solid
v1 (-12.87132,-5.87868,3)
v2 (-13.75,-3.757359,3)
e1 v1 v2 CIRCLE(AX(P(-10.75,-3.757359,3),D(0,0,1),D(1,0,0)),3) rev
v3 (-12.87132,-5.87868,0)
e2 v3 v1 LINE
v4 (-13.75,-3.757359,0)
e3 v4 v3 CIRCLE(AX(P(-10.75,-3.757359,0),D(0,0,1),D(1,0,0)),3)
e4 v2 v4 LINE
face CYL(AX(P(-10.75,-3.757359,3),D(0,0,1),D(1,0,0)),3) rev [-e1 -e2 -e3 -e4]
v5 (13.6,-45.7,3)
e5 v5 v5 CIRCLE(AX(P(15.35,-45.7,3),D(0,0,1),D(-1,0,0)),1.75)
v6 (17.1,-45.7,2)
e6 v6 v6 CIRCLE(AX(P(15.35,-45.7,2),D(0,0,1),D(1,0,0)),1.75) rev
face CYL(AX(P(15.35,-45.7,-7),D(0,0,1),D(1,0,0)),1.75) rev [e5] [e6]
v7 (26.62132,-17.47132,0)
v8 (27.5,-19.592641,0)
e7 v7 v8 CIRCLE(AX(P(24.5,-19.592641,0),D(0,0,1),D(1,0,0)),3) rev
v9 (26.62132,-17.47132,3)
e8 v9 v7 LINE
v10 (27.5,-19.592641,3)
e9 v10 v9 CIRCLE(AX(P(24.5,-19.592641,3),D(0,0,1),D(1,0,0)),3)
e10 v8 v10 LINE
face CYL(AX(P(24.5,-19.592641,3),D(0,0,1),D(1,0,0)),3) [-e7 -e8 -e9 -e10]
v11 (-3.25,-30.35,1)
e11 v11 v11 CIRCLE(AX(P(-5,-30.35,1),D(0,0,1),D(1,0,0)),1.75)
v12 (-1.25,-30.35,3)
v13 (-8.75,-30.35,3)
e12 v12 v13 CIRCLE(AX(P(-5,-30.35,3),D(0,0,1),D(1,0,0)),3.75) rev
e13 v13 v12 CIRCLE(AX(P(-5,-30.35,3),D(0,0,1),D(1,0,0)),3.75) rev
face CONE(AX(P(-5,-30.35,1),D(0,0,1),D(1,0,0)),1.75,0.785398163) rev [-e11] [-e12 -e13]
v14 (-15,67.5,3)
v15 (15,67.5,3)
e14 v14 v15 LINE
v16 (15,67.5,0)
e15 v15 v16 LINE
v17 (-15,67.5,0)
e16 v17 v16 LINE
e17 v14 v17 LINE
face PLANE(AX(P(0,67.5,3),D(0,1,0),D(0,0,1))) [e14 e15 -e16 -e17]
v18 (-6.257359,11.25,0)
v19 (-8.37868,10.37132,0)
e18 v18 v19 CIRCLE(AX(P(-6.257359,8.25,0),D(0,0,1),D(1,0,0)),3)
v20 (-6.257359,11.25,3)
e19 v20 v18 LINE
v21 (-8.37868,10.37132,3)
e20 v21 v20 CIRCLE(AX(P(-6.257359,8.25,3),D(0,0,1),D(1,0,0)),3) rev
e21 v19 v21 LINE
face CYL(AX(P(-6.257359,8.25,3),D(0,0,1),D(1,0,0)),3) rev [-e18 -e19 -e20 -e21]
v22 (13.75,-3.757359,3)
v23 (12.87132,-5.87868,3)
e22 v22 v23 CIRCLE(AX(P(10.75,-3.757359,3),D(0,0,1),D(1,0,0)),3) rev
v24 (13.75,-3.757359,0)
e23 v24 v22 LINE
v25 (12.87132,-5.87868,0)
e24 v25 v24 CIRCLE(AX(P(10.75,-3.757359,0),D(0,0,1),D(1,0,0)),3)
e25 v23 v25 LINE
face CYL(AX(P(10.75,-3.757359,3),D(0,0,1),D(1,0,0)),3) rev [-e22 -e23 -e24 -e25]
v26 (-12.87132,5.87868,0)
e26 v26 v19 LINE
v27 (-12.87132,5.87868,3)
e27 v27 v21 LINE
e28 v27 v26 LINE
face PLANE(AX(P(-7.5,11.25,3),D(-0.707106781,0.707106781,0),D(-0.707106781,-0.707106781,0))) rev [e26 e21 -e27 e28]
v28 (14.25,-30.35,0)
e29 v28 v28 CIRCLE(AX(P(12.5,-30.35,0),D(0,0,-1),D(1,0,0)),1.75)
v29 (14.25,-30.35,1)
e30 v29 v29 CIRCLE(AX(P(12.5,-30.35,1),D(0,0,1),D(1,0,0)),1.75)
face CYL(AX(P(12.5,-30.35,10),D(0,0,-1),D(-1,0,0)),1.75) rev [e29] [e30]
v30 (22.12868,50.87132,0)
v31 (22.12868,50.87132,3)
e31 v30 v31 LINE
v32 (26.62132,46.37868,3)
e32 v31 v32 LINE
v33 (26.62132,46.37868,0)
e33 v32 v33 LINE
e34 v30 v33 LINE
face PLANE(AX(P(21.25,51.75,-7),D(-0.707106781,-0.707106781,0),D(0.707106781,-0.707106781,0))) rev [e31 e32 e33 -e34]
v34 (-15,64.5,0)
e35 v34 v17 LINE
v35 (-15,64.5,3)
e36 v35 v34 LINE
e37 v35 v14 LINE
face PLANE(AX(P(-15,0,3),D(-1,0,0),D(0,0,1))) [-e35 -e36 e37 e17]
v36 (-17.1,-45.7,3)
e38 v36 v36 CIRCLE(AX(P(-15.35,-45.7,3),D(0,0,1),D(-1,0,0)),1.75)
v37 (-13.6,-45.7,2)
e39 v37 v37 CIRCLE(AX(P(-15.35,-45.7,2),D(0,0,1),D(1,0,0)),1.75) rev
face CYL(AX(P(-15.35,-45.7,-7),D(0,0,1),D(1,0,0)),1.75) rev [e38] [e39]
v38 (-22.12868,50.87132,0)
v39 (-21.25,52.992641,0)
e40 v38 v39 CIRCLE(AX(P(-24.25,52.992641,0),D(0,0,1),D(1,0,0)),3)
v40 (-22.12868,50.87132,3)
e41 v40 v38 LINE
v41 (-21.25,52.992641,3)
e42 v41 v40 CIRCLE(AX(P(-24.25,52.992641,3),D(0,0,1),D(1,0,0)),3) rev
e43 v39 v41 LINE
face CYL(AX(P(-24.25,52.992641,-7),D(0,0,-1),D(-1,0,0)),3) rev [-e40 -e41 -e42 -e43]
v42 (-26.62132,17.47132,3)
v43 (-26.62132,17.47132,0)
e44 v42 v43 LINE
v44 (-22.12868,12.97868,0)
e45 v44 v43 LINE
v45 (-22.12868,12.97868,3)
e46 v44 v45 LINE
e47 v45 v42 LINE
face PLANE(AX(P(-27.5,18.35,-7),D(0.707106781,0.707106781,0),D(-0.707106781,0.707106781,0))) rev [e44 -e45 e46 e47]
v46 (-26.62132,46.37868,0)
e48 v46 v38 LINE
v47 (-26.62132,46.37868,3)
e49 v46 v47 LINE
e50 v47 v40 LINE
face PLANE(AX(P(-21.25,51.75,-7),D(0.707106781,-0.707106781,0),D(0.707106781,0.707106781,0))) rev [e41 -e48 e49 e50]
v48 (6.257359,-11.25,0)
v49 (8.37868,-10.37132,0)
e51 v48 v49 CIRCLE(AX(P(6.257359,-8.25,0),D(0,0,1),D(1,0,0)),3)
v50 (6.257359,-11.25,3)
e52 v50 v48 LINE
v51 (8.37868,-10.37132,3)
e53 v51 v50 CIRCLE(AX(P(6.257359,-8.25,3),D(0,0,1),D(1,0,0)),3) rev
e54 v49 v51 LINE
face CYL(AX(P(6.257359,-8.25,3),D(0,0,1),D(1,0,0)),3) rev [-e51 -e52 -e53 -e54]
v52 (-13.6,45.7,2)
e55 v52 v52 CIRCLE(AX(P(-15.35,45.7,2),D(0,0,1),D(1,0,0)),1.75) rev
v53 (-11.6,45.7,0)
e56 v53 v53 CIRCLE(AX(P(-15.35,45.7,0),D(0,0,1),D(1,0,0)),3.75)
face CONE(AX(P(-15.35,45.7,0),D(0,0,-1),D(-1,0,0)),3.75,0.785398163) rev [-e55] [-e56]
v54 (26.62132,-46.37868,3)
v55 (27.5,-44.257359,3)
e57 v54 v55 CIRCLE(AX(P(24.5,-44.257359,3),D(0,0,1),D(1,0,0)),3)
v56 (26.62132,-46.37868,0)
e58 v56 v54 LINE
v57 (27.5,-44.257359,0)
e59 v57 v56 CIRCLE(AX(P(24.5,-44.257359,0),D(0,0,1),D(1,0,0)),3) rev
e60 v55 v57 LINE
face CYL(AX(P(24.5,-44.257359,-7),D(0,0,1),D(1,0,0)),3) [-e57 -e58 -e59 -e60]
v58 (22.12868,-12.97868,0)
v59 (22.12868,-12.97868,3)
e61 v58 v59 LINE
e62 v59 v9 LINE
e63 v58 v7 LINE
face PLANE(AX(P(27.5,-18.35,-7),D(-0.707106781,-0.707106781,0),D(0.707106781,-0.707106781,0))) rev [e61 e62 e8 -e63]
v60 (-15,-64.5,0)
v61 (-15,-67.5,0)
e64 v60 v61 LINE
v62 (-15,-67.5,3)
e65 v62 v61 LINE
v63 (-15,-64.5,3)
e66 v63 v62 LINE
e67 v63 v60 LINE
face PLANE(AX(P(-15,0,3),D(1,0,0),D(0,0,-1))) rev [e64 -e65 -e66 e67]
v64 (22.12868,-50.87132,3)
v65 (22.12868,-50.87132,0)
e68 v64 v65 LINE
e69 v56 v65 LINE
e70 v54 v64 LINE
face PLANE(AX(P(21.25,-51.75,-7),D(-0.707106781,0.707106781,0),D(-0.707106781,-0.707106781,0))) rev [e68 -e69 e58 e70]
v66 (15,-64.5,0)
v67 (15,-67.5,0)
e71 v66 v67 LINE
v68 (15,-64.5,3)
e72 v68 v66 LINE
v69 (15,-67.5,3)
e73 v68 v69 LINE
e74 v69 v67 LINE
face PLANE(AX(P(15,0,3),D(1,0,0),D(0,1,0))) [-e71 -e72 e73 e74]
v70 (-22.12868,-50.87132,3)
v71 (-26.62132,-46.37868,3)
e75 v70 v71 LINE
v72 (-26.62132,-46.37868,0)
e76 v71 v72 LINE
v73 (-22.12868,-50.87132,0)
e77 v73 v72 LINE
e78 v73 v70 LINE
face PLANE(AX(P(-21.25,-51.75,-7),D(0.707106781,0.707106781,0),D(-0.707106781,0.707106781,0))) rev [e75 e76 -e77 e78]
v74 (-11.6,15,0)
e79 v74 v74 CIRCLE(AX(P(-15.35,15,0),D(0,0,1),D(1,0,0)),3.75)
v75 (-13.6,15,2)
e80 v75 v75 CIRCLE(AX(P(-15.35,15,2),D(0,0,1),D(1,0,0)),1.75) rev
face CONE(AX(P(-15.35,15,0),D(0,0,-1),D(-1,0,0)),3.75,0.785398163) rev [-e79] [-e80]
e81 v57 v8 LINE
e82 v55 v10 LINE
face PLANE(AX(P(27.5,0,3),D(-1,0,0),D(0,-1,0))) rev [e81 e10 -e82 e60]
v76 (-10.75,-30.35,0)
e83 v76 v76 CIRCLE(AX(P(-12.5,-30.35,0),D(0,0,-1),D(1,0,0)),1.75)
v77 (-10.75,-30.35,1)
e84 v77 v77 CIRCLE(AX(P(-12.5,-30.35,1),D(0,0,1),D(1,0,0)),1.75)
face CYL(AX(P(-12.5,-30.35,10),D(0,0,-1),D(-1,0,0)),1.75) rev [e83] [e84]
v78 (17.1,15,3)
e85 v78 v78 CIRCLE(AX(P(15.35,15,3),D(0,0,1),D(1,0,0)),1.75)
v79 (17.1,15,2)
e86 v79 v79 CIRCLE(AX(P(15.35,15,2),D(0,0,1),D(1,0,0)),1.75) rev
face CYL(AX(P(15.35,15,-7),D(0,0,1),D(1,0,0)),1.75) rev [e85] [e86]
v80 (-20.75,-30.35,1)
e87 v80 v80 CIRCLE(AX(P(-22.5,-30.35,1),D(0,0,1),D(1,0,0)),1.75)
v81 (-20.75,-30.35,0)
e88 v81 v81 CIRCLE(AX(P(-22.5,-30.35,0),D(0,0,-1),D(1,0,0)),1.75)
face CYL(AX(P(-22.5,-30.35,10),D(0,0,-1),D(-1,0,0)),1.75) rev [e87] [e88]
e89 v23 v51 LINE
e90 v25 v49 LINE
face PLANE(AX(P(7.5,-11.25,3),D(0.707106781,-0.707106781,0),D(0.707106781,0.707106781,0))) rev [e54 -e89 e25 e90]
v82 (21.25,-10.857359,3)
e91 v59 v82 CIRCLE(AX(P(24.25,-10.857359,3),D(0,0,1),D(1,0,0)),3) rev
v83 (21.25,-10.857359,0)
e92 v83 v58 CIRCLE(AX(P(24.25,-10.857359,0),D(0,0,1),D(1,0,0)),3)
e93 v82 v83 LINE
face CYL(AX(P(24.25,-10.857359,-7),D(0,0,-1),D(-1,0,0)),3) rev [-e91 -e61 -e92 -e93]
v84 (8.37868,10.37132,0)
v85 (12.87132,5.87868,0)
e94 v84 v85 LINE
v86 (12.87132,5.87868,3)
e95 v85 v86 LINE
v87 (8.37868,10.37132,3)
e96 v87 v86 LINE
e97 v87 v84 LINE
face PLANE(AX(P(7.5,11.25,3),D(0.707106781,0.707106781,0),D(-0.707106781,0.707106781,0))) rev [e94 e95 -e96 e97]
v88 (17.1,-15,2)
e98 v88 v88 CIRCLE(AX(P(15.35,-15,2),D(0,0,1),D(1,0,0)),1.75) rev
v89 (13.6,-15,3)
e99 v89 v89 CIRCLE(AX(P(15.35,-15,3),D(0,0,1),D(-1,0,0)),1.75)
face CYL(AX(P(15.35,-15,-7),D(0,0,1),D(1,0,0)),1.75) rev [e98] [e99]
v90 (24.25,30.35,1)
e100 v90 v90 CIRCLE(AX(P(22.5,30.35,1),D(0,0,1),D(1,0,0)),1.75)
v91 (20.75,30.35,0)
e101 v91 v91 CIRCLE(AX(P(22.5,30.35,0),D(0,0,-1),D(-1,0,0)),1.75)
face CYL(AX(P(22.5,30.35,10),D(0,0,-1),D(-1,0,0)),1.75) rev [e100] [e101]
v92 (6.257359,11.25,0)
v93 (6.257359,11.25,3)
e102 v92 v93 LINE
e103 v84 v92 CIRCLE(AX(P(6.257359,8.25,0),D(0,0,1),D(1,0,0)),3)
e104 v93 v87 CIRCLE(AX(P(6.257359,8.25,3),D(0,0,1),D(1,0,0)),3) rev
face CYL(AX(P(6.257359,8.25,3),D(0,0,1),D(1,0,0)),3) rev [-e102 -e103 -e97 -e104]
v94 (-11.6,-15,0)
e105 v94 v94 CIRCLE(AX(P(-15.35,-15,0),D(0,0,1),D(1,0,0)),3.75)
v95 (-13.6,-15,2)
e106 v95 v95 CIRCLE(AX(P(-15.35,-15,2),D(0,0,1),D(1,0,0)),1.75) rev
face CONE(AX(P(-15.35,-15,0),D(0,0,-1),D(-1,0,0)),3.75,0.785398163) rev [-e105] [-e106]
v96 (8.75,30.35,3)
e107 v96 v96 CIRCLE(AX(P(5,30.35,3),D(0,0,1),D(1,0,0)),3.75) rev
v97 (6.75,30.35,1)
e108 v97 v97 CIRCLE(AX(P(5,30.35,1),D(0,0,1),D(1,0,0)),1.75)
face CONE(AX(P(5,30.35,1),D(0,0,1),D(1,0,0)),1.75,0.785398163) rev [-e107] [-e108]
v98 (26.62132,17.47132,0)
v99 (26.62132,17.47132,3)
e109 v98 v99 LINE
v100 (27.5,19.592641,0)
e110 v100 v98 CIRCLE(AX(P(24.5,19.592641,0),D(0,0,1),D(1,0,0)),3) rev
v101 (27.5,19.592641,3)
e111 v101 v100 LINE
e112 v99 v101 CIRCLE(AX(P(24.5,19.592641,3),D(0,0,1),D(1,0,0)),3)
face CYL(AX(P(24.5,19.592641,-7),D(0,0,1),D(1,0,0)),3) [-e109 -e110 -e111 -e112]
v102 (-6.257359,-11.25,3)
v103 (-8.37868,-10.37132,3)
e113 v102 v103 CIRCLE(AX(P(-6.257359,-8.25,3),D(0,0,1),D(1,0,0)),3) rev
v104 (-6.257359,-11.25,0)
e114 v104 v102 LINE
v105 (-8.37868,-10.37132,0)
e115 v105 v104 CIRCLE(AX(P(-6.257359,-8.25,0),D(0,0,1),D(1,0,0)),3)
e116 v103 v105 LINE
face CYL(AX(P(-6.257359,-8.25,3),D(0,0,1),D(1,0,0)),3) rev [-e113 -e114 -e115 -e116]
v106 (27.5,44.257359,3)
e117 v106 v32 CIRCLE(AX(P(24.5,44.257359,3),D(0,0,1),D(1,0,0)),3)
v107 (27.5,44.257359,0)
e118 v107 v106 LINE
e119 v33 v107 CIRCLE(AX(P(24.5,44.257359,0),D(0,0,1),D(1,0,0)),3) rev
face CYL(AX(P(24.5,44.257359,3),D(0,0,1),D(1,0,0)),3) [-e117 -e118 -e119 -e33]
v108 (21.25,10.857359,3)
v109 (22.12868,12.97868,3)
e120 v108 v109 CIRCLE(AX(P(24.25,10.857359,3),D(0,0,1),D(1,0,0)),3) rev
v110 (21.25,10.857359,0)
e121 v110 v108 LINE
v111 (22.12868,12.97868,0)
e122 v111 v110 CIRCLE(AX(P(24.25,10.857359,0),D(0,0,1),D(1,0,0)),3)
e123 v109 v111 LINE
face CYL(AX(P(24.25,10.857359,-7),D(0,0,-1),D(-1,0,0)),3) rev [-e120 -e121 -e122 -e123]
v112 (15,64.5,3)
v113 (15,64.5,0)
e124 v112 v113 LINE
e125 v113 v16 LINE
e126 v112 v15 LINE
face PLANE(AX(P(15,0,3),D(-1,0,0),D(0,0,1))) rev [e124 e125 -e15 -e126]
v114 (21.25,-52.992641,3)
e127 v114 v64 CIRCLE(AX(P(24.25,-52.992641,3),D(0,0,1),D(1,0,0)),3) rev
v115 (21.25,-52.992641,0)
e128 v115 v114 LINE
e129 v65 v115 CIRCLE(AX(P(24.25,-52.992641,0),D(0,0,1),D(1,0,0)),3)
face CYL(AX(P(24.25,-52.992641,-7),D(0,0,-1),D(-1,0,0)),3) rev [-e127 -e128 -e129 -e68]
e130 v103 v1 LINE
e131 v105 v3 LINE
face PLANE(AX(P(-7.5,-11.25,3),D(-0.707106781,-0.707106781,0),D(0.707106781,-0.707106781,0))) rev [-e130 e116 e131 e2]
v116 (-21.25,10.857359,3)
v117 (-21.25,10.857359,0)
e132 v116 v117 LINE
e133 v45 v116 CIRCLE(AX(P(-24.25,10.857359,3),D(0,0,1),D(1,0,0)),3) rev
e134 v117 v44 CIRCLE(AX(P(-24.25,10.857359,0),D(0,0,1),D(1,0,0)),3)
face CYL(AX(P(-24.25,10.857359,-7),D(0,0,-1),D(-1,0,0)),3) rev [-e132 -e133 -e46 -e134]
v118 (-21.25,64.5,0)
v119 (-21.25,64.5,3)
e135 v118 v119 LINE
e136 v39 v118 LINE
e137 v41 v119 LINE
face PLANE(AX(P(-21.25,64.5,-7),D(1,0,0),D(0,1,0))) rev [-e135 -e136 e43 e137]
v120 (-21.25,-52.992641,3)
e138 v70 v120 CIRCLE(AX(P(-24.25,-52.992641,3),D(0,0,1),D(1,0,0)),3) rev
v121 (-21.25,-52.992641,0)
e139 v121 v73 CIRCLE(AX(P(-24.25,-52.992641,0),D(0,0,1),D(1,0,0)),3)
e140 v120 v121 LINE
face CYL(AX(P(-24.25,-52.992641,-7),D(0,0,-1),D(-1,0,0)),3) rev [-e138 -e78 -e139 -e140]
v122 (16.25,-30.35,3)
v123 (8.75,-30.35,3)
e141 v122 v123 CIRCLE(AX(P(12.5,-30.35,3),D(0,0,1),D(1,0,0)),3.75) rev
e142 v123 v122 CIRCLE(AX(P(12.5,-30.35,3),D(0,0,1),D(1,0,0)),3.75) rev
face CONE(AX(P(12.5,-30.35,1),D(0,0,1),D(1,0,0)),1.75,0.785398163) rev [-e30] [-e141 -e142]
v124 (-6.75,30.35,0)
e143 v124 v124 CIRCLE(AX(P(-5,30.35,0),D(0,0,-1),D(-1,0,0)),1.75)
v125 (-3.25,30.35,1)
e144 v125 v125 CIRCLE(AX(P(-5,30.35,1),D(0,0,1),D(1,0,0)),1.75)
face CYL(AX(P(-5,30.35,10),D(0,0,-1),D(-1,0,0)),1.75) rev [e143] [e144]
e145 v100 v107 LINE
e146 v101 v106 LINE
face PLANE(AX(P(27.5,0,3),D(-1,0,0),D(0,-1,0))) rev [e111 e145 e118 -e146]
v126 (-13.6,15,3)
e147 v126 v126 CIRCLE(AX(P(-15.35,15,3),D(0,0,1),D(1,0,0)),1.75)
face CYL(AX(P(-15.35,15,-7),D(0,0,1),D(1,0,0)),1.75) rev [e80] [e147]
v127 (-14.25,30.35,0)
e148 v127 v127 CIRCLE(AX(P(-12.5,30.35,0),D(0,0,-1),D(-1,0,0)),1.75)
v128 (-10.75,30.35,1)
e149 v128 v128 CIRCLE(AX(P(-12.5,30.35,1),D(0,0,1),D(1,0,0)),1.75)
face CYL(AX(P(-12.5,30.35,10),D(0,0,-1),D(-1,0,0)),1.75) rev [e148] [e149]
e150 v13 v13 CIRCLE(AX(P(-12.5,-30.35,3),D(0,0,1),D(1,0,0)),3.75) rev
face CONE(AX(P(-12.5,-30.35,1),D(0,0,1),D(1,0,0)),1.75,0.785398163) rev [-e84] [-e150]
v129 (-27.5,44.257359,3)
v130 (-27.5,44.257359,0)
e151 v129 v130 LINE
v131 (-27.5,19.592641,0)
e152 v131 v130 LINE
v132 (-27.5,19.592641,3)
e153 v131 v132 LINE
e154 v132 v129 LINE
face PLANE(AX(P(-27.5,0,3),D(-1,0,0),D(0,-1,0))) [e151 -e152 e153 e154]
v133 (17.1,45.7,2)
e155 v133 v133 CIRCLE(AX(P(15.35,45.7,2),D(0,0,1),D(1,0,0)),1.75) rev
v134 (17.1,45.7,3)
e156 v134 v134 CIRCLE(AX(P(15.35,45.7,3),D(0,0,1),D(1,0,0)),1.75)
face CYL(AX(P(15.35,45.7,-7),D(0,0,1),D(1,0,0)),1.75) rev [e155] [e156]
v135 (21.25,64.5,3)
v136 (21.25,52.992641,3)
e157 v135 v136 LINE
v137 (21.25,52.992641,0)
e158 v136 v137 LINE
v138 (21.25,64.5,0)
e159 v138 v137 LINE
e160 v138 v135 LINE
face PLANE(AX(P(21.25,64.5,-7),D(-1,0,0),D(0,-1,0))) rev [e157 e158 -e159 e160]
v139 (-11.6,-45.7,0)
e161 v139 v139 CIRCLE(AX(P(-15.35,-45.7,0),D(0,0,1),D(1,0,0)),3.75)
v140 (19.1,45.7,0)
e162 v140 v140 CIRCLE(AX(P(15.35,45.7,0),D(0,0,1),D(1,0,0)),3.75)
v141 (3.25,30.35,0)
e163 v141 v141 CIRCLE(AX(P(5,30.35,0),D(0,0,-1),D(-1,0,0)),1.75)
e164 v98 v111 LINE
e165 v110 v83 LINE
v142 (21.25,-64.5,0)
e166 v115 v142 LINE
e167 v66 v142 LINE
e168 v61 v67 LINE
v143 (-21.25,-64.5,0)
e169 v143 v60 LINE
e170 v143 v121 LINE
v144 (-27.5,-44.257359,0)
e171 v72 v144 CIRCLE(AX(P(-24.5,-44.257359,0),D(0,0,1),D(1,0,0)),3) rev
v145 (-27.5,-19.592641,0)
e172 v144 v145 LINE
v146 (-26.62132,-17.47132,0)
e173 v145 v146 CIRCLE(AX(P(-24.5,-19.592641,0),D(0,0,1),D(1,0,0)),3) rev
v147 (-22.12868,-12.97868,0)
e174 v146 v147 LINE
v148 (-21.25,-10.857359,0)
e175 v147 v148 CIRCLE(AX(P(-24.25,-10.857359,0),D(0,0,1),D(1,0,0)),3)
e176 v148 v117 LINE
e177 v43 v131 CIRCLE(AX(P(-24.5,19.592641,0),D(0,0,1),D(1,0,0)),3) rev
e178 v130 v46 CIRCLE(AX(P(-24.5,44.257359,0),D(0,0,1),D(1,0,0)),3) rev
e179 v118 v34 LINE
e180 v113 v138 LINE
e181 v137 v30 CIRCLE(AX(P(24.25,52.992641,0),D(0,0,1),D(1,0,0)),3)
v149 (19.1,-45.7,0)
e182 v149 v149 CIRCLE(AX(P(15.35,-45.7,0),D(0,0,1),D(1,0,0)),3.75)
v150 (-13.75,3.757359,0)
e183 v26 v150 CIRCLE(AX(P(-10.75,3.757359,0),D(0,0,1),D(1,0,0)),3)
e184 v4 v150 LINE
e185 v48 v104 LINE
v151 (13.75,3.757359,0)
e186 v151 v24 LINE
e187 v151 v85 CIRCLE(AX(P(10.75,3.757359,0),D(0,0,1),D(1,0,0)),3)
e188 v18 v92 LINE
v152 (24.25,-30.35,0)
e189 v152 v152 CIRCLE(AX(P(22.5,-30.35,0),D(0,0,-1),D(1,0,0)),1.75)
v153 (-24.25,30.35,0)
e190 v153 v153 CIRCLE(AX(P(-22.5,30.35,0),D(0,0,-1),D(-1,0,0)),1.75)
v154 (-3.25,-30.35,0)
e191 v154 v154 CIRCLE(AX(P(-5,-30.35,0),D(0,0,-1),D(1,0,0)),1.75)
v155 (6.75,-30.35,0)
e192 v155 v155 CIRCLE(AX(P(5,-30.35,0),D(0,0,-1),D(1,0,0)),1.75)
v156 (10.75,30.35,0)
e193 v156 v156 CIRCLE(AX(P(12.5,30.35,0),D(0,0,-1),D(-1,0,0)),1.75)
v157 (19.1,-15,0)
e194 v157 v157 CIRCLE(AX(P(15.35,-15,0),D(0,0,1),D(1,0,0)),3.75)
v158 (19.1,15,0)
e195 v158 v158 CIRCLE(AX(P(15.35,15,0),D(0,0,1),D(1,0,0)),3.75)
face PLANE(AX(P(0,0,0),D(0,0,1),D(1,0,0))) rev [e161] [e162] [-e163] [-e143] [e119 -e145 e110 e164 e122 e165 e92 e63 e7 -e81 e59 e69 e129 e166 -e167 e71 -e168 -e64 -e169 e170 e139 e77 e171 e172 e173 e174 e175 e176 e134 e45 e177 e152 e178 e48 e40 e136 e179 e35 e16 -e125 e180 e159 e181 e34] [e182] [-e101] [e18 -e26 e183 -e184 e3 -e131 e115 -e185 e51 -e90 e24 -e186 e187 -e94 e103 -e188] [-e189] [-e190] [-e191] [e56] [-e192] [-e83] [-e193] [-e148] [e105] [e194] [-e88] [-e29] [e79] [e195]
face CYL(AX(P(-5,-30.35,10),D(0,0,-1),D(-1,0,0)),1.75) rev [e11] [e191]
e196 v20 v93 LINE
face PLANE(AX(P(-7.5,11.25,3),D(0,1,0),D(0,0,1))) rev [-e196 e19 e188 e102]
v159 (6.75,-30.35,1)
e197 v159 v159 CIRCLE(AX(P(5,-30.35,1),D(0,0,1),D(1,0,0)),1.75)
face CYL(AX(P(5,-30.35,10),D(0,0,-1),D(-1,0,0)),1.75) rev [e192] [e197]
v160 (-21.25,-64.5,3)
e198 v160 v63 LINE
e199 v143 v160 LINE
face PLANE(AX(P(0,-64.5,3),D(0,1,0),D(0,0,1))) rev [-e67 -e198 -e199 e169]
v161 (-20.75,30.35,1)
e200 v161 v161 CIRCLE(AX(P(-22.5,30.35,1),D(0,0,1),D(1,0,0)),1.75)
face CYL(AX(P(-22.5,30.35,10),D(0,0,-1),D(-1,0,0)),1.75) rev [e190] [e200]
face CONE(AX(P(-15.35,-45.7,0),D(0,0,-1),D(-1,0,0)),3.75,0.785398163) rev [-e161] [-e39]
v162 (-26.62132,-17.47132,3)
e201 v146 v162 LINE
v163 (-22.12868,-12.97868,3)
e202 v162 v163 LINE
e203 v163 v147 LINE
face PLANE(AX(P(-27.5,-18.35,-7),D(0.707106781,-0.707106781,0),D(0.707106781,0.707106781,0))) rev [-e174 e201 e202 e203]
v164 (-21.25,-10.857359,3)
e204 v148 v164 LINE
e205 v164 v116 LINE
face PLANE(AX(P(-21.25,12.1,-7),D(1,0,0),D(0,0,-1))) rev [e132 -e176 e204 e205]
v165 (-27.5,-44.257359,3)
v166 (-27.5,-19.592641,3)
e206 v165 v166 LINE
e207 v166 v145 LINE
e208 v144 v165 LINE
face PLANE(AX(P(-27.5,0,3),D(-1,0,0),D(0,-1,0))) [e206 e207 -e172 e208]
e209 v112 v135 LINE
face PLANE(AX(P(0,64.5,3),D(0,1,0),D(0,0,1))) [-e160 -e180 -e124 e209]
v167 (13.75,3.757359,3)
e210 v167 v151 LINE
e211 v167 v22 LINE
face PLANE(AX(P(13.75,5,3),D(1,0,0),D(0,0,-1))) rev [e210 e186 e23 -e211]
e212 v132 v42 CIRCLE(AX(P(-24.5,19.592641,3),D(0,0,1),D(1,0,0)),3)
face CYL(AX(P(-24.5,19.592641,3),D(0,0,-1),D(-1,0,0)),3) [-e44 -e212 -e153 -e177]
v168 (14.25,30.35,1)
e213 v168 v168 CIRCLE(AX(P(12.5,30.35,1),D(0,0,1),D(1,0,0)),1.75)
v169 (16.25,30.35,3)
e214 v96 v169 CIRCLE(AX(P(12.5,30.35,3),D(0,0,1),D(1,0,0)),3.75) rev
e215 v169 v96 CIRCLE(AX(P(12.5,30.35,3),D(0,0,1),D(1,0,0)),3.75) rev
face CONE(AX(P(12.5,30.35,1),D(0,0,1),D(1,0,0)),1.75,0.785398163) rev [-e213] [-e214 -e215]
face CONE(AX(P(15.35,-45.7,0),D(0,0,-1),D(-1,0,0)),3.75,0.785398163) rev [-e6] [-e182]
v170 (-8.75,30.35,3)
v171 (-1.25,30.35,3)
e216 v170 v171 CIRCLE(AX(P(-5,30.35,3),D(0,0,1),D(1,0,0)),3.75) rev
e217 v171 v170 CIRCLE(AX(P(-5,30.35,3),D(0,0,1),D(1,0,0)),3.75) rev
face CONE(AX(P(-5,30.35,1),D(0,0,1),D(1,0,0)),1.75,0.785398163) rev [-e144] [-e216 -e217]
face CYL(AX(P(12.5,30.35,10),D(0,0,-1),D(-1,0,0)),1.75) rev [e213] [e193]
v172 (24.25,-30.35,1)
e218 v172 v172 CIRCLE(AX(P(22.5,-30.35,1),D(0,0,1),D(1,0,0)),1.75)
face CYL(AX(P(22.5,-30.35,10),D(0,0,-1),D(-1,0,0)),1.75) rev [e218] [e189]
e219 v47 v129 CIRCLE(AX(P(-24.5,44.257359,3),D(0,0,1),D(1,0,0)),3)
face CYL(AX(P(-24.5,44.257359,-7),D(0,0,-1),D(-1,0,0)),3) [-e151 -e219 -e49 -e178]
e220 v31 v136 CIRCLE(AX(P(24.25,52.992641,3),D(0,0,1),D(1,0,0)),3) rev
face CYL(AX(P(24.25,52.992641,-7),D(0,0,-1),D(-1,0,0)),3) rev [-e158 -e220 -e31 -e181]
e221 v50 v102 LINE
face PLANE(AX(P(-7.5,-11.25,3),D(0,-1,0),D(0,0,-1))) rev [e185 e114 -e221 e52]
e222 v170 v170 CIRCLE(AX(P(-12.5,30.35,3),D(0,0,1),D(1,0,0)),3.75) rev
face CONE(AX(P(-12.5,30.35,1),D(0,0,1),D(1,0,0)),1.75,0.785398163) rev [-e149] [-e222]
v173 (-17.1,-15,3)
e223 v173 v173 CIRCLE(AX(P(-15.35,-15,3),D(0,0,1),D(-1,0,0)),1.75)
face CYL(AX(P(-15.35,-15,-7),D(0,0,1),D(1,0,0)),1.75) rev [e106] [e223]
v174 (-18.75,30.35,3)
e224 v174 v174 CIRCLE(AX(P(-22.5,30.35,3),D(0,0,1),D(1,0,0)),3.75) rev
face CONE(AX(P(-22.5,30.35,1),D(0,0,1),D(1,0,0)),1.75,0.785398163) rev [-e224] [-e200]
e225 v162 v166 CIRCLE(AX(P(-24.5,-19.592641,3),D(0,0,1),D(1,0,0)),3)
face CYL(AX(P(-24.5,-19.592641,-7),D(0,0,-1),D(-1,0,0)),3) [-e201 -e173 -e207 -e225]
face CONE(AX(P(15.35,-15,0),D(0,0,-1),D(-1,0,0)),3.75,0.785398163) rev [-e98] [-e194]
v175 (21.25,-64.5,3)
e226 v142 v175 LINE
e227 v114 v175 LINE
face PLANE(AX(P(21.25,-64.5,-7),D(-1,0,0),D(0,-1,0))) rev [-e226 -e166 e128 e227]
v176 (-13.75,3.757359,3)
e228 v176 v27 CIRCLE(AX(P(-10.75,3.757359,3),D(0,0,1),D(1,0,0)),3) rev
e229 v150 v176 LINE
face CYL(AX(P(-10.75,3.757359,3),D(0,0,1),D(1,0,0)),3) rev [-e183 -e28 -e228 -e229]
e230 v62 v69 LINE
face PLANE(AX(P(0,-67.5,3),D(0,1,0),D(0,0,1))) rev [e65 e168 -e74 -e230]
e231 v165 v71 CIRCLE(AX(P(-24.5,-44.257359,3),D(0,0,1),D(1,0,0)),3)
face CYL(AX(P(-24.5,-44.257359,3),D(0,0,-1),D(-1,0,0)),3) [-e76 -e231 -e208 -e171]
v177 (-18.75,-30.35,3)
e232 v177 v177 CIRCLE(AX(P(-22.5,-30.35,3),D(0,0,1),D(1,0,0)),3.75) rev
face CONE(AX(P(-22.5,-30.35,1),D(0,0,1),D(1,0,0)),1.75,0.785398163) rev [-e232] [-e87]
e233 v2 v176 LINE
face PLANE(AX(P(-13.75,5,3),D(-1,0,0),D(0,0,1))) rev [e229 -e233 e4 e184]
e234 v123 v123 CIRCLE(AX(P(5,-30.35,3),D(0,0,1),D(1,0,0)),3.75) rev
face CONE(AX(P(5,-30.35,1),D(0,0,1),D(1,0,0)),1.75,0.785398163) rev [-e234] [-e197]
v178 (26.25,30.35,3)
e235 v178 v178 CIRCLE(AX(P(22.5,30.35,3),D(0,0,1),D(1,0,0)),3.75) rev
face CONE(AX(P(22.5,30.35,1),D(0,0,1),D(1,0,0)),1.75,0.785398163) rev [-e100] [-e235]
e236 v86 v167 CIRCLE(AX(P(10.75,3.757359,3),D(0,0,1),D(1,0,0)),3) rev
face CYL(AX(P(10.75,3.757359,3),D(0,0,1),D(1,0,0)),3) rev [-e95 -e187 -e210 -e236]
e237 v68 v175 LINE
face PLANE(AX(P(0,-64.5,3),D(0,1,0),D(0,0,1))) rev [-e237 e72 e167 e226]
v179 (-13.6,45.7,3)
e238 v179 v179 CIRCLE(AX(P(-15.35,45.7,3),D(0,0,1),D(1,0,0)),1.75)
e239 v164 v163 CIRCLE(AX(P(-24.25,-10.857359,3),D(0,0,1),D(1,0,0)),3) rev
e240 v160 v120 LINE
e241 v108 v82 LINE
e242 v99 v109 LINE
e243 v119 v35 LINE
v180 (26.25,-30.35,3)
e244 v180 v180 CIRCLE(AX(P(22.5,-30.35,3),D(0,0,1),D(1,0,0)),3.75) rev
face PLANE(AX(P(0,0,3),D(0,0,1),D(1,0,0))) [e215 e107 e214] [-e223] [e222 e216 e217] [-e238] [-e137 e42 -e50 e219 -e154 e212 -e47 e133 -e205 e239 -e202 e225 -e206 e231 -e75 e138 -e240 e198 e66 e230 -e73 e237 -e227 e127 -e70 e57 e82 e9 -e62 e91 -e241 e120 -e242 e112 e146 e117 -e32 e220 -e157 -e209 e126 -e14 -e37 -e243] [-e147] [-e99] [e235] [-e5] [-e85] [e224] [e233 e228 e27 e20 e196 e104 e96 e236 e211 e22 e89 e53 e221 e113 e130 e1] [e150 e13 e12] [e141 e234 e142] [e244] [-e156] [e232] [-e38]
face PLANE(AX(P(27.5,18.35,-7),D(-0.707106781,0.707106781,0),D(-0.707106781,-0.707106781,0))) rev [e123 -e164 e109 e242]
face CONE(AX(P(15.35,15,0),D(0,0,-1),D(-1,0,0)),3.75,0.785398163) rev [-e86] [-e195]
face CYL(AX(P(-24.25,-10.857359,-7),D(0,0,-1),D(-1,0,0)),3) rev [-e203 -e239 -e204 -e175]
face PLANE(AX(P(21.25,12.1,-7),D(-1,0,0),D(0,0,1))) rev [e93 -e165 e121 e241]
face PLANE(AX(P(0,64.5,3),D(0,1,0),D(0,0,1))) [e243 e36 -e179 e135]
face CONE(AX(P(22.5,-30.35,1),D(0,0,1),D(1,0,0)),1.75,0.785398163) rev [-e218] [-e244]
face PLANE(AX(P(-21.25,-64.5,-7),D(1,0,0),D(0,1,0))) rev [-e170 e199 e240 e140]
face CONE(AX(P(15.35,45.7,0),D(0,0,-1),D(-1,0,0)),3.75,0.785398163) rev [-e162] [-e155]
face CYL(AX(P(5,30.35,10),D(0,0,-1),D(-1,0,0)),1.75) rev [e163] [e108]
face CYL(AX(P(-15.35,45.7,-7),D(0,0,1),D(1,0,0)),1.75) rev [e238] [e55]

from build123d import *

# Parameters (mm, degrees)
SKETCH_1_W          = 55
SKETCH_1_H          = 129
SKETCH_1_W_2        = 30
SKETCH_1_H_2        = 6
EXTRUDE_1_DEPTH     = 3
SKETCH_2_R          = 1.75
CUT_EXTRUDE_1_DEPTH = 10
SKETCH_3_R          = 1.75
CUT_EXTRUDE_2_DEPTH = 10
CHAMFER_1_SIZE      = 2
CHAMFER_2_SIZE      = 2
CUT_EXTRUDE_3_DEPTH = 3
CUT_EXTRUDE_4_DEPTH = 10
FILLET_1_R          = 3
FILLET_2_R          = 3


with BuildPart() as part:
    # Эскиз1 → Бобышка-Вытянуть1 (new body)
    with BuildSketch(Plane.XY):
        Rectangle(SKETCH_1_W, SKETCH_1_H)
        with Locations((0, 64.5)):
            Rectangle(SKETCH_1_W_2, SKETCH_1_H_2)
        with Locations((0, -64.5)):
            Rectangle(SKETCH_1_W_2, SKETCH_1_H_2)
    extrude(amount=EXTRUDE_1_DEPTH)

    # Эскиз2 → Вырез-Вытянуть1 (cut)
    with BuildSketch(Plane.XY.offset(3)):
        with Locations((-15.35, 45.7)):
            Circle(SKETCH_2_R)
        with Locations((15.35, 45.7)):
            Circle(SKETCH_2_R)
        with Locations((15.35, 15)):
            Circle(SKETCH_2_R)
        with Locations((-15.35, 15)):
            Circle(SKETCH_2_R)
        with Locations((-15.35, -15)):
            Circle(SKETCH_2_R)
        with Locations((15.35, -15)):
            Circle(SKETCH_2_R)
        with Locations((15.35, -45.7)):
            Circle(SKETCH_2_R)
        with Locations((-15.35, -45.7)):
            Circle(SKETCH_2_R)
    extrude(amount=-CUT_EXTRUDE_1_DEPTH, mode=Mode.SUBTRACT)

    # Эскиз3 → Вырез-Вытянуть2 (cut)
    with BuildSketch(Plane(origin=(0, 0, 0), x_dir=(-1, 0, 0), z_dir=(0, 0, -1))):
        with Locations((-22.5, 30.35)):
            Circle(SKETCH_3_R)
        with Locations((-12.5, 30.35)):
            Circle(SKETCH_3_R)
        with Locations((-5, 30.35)):
            Circle(SKETCH_3_R)
        with Locations((5, 30.35)):
            Circle(SKETCH_3_R)
        with Locations((12.5, 30.35)):
            Circle(SKETCH_3_R)
        with Locations((22.5, 30.35)):
            Circle(SKETCH_3_R)
        with Locations(Location((22.5, -30.35, 0), (0, 0, 180))):
            Circle(SKETCH_3_R)
        with Locations(Location((12.5, -30.35, 0), (0, 0, 180))):
            Circle(SKETCH_3_R)
        with Locations(Location((5, -30.35, 0), (0, 0, 180))):
            Circle(SKETCH_3_R)
        with Locations(Location((-5, -30.35, 0), (0, 0, 180))):
            Circle(SKETCH_3_R)
        with Locations(Location((-12.5, -30.35, 0), (0, 0, 180))):
            Circle(SKETCH_3_R)
        with Locations(Location((-22.5, -30.35, 0), (0, 0, 180))):
            Circle(SKETCH_3_R)
    extrude(amount=-CUT_EXTRUDE_2_DEPTH, mode=Mode.SUBTRACT)

    # Фаска1
    chamfer_1_edges = [part.edges().sort_by_distance(p)[0] for p in [
        (-17.1, -15, 0),
        (-17.1, 15, 0),
        (13.6, 15, 0),
        (-17.1, 45.7, 0),
        (13.6, -15, 0),
        (13.6, -45.7, 0),
        (-17.1, -45.7, 0),
        (13.6, 45.7, 0),
    ]]
    chamfer(chamfer_1_edges, length=CHAMFER_1_SIZE)

    # Фаска2
    chamfer_2_edges = [part.edges().sort_by_distance(p)[0] for p in [
        (-6.75, -30.35, 3),
        (-14.25, -30.35, 3),
        (-24.25, -30.35, 3),
        (-20.75, 30.35, 3),
        (-10.75, 30.35, 3),
        (-3.25, 30.35, 3),
        (6.75, 30.35, 3),
        (14.25, 30.35, 3),
        (3.25, -30.35, 3),
        (10.75, -30.35, 3),
        (20.75, -30.35, 3),
        (24.25, 30.35, 3),
    ]]
    chamfer(chamfer_2_edges, length=CHAMFER_2_SIZE - 0.0001)  # a hair under: the kernel refuses the full size

    # Эскиз4 → Вырез-Вытянуть3 (cut)
    with BuildSketch(Plane(origin=(0, 0, 0), x_dir=(-1, 0, 0), z_dir=(0, 0, -1))):
        Polygon((7.5, 11.25), (-7.5, 11.25), (-13.75, 5), (-13.75, -5), (-7.5, -11.25), (7.5, -11.25), (13.75, -5), (13.75, 5), align=None)
    extrude(amount=-CUT_EXTRUDE_3_DEPTH, mode=Mode.SUBTRACT)

    # Эскиз6 → Вырез-Вытянуть4 (cut)
    with BuildSketch(Plane.XY.offset(3)):
        Polygon((21.25, 64.5), (21.25, 51.75), (27.5, 45.5), (29.222592787, 45.5), (29.222592787, 64.5), align=None)
        Polygon((-29.222592787, 45.5), (-27.5, 45.5), (-21.25, 51.75), (-21.25, 64.5), (-29.222592787, 64.5), align=None)
        Polygon((-21.25, -64.5), (-21.25, -51.75), (-27.5, -45.5), (-29.222592787, -45.5), (-29.222592787, -64.5), align=None)
        Polygon((29.222592787, -45.5), (27.5, -45.5), (21.25, -51.75), (21.25, -64.5), (29.222592787, -64.5), align=None)
        Polygon((-27.5, 18.35), (-21.25, 12.1), (-21.25, -12.1), (-27.5, -18.35), (-29.834520007, -18.35), (-29.834520007, 18.35), align=None)
        Polygon((27.5, -18.35), (21.25, -12.1), (21.25, 12.1), (27.5, 18.35), (30.388553895, 18.35), (30.388553895, -18.35), align=None)
    extrude(amount=-CUT_EXTRUDE_4_DEPTH, mode=Mode.SUBTRACT)

    # Скругление1
    fillet_1_edges = [part.edges().sort_by_distance(p)[0] for p in [
        (-27.5, 18.35, 1.5),
        (-21.25, 12.1, 1.5),
        (-21.25, -12.1, 1.5),
        (-27.5, -18.35, 1.5),
        (21.25, -51.75, 1.5),
        (27.5, -45.5, 1.5),
        (-27.5, -45.5, 1.5),
        (-21.25, -51.75, 1.5),
        (-21.25, 51.75, 1.5),
        (-27.5, 45.5, 1.5),
        (27.5, -18.35, 1.5),
        (21.25, -12.1, 1.5),
        (21.25, 12.1, 1.5),
        (27.5, 18.35, 1.5),
        (27.5, 45.5, 1.5),
        (21.25, 51.75, 1.5),
    ]]
    fillet(fillet_1_edges, radius=FILLET_1_R)

    # Скругление2
    fillet_2_edges = [part.edges().sort_by_distance(p)[0] for p in [
        (-7.5, -11.25, 1.5),
        (7.5, -11.25, 1.5),
        (13.75, -5, 1.5),
        (13.75, 5, 1.5),
        (7.5, 11.25, 1.5),
        (-7.5, 11.25, 1.5),
        (-13.75, 5, 1.5),
        (-13.75, -5, 1.5),
    ]]
    fillet(fillet_2_edges, radius=FILLET_2_R)


solid = part.part
